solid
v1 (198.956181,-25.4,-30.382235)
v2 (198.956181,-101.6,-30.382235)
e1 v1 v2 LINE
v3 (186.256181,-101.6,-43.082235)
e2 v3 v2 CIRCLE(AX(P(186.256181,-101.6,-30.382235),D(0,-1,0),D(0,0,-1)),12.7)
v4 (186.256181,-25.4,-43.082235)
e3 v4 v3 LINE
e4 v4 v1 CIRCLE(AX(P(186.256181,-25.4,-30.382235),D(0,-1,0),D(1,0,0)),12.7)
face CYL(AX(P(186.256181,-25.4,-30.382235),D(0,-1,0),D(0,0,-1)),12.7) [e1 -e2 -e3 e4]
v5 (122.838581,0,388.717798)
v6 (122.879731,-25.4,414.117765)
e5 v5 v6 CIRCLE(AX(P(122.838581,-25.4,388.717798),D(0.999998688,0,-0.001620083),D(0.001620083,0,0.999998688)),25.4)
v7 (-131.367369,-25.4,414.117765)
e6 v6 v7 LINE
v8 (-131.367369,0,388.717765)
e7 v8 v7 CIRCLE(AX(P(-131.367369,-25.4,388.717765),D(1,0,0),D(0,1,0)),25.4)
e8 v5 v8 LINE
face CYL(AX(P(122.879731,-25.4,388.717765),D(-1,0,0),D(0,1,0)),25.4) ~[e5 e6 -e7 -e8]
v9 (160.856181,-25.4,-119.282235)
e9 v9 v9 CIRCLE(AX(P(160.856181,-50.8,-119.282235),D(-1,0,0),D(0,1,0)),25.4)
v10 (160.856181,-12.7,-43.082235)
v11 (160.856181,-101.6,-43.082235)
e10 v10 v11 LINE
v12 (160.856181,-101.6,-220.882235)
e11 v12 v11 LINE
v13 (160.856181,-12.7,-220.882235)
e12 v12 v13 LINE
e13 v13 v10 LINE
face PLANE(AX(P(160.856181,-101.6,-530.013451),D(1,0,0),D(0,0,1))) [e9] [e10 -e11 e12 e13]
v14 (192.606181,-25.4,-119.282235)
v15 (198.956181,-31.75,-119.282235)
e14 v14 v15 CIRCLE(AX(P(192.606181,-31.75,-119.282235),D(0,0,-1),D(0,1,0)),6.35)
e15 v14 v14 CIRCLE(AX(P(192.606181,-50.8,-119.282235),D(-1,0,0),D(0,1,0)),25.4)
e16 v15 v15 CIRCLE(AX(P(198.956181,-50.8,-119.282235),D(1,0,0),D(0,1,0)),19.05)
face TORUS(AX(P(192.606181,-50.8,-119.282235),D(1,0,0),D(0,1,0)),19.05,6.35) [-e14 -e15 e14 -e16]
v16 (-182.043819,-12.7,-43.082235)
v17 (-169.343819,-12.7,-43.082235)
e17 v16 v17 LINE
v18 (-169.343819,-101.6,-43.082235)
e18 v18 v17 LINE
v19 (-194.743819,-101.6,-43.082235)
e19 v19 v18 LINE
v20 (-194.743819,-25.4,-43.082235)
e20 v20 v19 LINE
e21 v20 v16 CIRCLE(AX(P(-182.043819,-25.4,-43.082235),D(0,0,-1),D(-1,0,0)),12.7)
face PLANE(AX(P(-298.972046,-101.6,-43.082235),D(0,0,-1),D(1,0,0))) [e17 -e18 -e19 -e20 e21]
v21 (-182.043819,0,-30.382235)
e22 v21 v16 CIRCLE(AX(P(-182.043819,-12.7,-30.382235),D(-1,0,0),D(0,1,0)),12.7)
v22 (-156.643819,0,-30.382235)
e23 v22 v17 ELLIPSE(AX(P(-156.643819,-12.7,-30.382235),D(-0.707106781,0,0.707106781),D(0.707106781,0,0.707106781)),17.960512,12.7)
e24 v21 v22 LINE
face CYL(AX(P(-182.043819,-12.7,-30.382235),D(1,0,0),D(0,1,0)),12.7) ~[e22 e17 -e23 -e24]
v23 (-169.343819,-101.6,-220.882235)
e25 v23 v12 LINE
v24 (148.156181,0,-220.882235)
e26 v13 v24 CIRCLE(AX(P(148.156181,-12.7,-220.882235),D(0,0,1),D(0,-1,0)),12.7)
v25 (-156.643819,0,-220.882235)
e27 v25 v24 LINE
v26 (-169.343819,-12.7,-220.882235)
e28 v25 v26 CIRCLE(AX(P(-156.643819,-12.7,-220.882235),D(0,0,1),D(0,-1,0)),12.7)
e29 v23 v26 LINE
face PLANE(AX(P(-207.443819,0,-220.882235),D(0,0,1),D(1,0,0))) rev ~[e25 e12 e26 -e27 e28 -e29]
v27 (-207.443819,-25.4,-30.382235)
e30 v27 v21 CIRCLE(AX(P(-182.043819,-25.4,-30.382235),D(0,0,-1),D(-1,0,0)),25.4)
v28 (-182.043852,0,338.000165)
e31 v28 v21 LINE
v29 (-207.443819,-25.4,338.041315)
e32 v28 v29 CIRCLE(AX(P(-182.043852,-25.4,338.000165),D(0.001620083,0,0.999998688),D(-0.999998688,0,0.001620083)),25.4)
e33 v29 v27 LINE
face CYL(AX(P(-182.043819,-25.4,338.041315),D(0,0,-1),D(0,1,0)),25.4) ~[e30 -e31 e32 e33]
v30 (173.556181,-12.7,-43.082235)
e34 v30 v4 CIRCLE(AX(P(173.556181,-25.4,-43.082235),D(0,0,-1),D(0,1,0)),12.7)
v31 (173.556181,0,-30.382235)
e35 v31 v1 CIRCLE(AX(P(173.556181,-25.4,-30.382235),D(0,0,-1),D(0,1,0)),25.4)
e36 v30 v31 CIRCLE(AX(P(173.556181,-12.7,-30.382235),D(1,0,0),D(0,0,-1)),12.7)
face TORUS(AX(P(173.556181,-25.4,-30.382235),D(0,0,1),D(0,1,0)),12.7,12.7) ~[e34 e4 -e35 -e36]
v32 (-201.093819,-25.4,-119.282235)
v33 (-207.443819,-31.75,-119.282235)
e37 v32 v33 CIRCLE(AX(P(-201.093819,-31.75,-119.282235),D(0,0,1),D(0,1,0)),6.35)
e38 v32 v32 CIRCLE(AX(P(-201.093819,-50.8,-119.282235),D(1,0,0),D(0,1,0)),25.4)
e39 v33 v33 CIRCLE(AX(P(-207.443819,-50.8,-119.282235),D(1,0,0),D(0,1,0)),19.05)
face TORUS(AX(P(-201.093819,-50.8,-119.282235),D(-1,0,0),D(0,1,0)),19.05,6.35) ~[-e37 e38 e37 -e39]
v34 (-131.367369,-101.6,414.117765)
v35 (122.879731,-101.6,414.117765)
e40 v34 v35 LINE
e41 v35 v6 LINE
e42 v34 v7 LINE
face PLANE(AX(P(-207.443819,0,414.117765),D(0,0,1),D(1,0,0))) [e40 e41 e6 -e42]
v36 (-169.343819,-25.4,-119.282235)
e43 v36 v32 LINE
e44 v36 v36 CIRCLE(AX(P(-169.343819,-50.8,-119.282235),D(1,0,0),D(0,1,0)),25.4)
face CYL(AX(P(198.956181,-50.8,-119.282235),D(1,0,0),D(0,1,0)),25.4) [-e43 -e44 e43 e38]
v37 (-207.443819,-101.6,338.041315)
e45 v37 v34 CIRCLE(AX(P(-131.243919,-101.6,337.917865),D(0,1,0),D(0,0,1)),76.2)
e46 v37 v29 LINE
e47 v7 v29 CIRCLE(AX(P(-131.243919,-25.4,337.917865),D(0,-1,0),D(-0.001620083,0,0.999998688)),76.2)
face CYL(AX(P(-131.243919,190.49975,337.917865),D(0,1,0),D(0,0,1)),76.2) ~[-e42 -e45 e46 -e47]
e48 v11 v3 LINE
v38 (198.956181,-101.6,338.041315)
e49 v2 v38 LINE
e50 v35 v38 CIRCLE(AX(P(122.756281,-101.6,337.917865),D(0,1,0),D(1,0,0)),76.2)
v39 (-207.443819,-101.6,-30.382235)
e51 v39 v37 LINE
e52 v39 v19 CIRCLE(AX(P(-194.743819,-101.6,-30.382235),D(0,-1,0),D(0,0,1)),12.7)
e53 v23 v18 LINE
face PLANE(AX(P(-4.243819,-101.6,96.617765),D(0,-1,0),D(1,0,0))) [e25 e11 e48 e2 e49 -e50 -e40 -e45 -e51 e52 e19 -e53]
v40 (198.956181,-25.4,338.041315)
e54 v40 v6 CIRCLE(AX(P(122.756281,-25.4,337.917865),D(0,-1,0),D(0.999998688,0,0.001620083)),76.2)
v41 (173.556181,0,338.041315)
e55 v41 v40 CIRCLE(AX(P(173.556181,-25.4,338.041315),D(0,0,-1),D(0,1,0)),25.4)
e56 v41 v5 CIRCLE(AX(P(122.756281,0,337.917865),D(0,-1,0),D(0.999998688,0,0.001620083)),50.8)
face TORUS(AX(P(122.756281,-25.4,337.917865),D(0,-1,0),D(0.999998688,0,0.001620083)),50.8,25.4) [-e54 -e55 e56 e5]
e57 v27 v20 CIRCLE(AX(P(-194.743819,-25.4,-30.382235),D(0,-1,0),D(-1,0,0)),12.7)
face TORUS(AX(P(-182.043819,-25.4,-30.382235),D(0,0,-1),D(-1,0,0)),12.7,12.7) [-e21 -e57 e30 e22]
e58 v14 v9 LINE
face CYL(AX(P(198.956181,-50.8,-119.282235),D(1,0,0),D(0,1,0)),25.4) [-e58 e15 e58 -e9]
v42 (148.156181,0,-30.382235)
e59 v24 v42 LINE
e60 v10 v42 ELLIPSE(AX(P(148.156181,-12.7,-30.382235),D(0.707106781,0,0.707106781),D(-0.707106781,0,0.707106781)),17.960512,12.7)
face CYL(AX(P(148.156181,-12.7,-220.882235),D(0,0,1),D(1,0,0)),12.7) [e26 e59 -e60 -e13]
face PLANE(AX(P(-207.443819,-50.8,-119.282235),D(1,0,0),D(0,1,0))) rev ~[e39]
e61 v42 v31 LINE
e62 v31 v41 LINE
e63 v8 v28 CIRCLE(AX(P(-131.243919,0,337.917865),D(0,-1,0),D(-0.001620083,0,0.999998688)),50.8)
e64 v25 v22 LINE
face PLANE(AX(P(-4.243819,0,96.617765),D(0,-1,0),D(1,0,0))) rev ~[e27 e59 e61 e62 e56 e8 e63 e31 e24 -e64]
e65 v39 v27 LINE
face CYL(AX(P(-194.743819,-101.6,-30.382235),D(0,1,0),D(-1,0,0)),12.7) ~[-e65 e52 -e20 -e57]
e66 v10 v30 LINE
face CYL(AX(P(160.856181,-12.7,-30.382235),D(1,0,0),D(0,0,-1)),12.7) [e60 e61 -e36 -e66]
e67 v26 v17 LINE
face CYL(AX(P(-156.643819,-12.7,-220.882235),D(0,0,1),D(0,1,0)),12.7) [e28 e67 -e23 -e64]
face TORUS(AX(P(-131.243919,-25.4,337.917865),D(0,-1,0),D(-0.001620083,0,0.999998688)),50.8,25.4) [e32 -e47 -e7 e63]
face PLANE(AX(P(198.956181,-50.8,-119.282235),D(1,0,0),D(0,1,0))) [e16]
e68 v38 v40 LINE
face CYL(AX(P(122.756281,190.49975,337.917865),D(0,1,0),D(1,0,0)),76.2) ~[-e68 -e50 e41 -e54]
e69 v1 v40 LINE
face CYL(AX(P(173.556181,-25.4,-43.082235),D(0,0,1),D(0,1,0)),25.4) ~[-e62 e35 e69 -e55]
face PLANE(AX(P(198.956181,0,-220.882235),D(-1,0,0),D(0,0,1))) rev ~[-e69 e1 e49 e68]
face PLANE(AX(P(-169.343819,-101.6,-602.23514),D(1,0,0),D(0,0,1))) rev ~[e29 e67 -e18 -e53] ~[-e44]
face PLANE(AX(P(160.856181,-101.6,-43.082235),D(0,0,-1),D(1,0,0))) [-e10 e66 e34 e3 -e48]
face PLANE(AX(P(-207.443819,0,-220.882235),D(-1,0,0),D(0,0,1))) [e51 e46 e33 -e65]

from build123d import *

# Parameters (mm, degrees)
F0_W        = 406.4
F0_H        = 635
F1_DEPTH    = 101.6
F2_W        = 129.6282266226
F2_H        = 559.1529050058
F2_W_2      = 230.7462543249
F2_H_2      = 486.9312153578
F3_DEPTH    = 127
F4_T1_DEPTH = 482.5995000003
F5_R        = 25.4
F6_R        = 25.4
F7_DEPTH    = 406.4
F8_R        = 6.35
F9_R        = 12.7
F10_DEPTH   = 25.4


# Not quite as in the source:
# - a fillet or chamfer that OpenCascade refuses, or shapes differently, is made with other operations: its cross-section is extruded or revolved along the edge and cut away or added
# - a feature names something its author has since deleted; it is built from what else it names


with BuildPart() as f1:
    # F0 (on Front) → F1 (new body)
    with BuildSketch(Plane.XZ):
        with Locations((-4.243819043, 96.6177646602)):
            Rectangle(F0_W, F0_H)
    extrude(amount=F1_DEPTH)

    # F2 (on face) → F3 (cut)
    with BuildSketch(Plane.XZ.offset(101.6)):
        with Locations((-234.1579323543, -322.6586878427)):
            Rectangle(F2_W, F2_H)
        with Locations((276.2293081194, -286.5478430187)):
            Rectangle(F2_W_2, F2_H_2)
    extrude(amount=-F3_DEPTH, mode=Mode.SUBTRACT)

    # F4: fillet of radius 76.2 on 2 edges, made by hand

    # F4_s2 → F4_t1 (cut)
    with BuildSketch(Plane.XZ.offset(-190.4997500002)):
        with BuildLine():
            ThreePointArc((198.956280957, 337.9178646602), (176.6378176834, 391.7994013866), (122.756280957, 414.1178646602))
            Line((122.756280957, 414.1178646602), (122.756280957, 415.6418646602))
            Line((122.756280957, 415.6418646602), (200.480180957, 415.6417646602))
            Line((200.480180957, 415.6417646602), (200.480280957, 337.9178646602))
            Line((200.480280957, 337.9178646602), (198.956280957, 337.9178646602))
        make_face()
        with BuildLine():
            ThreePointArc((-131.243919043, 414.1178646602), (-185.1254557695, 391.7994013866), (-207.443919043, 337.9178646602))
            Line((-207.443919043, 337.9178646602), (-208.967919043, 337.9178646602))
            Line((-208.967919043, 337.9178646602), (-208.967819043, 415.6417646602))
            Line((-208.967819043, 415.6417646602), (-131.243919043, 415.6418646602))
            Line((-131.243919043, 415.6418646602), (-131.243919043, 414.1178646602))
        make_face()
    extrude(amount=F4_T1_DEPTH, mode=Mode.SUBTRACT)

    # F5
    f5_edges = [f1.edges().sort_by_distance(p)[0] for p in [
        (198.956181, 0, 147.47954),
        (176.637818, 0, 391.799401),
        (-4.243819, 0, 414.117765),
        (-185.125456, 0, 391.799401),
        (-207.443819, 0, 147.47954),
    ]]
    fillet(f5_edges, radius=F5_R)

    # F6 (on face) → F7 (join)
    with BuildSketch(Plane.YZ.offset(198.956180957)):
        with Locations((-50.8, -119.2822353398)):
            Circle(F6_R)
    extrude(amount=-F7_DEPTH)

    # F8
    f8_edges = [f1.edges().sort_by_distance(p)[0] for p in [
        (-207.443819, -76.2, -119.282235),
        (198.956181, -76.2, -119.282235),
    ]]
    fillet(f8_edges, radius=F8_R)

    # F9
    f9_edges = [f1.edges().sort_by_distance(p)[0] for p in [
        (-169.343819, 0, -131.982235),
        (-175.693819, 0, -43.082235),
        (-200.004331, -7.439488, -43.082235),
        (-207.443819, -63.5, -43.082235),
        (160.856181, 0, -131.982235),
        (167.206181, 0, -43.082235),
        (191.516693, -7.439488, -43.082235),
        (198.956181, -63.5, -43.082235),
    ]]
    fillet(f9_edges, radius=F9_R)

    # F2 (on face) → F10 (cut)
    with BuildSketch(Plane.XZ.offset(101.6)):
        with Locations((-234.1579323543, -322.6586878427)):
            Rectangle(F2_W, F2_H)
        with Locations((276.2293081194, -286.5478430187)):
            Rectangle(F2_W_2, F2_H_2)
    extrude(amount=-F10_DEPTH, mode=Mode.SUBTRACT)


solid = f1.part
